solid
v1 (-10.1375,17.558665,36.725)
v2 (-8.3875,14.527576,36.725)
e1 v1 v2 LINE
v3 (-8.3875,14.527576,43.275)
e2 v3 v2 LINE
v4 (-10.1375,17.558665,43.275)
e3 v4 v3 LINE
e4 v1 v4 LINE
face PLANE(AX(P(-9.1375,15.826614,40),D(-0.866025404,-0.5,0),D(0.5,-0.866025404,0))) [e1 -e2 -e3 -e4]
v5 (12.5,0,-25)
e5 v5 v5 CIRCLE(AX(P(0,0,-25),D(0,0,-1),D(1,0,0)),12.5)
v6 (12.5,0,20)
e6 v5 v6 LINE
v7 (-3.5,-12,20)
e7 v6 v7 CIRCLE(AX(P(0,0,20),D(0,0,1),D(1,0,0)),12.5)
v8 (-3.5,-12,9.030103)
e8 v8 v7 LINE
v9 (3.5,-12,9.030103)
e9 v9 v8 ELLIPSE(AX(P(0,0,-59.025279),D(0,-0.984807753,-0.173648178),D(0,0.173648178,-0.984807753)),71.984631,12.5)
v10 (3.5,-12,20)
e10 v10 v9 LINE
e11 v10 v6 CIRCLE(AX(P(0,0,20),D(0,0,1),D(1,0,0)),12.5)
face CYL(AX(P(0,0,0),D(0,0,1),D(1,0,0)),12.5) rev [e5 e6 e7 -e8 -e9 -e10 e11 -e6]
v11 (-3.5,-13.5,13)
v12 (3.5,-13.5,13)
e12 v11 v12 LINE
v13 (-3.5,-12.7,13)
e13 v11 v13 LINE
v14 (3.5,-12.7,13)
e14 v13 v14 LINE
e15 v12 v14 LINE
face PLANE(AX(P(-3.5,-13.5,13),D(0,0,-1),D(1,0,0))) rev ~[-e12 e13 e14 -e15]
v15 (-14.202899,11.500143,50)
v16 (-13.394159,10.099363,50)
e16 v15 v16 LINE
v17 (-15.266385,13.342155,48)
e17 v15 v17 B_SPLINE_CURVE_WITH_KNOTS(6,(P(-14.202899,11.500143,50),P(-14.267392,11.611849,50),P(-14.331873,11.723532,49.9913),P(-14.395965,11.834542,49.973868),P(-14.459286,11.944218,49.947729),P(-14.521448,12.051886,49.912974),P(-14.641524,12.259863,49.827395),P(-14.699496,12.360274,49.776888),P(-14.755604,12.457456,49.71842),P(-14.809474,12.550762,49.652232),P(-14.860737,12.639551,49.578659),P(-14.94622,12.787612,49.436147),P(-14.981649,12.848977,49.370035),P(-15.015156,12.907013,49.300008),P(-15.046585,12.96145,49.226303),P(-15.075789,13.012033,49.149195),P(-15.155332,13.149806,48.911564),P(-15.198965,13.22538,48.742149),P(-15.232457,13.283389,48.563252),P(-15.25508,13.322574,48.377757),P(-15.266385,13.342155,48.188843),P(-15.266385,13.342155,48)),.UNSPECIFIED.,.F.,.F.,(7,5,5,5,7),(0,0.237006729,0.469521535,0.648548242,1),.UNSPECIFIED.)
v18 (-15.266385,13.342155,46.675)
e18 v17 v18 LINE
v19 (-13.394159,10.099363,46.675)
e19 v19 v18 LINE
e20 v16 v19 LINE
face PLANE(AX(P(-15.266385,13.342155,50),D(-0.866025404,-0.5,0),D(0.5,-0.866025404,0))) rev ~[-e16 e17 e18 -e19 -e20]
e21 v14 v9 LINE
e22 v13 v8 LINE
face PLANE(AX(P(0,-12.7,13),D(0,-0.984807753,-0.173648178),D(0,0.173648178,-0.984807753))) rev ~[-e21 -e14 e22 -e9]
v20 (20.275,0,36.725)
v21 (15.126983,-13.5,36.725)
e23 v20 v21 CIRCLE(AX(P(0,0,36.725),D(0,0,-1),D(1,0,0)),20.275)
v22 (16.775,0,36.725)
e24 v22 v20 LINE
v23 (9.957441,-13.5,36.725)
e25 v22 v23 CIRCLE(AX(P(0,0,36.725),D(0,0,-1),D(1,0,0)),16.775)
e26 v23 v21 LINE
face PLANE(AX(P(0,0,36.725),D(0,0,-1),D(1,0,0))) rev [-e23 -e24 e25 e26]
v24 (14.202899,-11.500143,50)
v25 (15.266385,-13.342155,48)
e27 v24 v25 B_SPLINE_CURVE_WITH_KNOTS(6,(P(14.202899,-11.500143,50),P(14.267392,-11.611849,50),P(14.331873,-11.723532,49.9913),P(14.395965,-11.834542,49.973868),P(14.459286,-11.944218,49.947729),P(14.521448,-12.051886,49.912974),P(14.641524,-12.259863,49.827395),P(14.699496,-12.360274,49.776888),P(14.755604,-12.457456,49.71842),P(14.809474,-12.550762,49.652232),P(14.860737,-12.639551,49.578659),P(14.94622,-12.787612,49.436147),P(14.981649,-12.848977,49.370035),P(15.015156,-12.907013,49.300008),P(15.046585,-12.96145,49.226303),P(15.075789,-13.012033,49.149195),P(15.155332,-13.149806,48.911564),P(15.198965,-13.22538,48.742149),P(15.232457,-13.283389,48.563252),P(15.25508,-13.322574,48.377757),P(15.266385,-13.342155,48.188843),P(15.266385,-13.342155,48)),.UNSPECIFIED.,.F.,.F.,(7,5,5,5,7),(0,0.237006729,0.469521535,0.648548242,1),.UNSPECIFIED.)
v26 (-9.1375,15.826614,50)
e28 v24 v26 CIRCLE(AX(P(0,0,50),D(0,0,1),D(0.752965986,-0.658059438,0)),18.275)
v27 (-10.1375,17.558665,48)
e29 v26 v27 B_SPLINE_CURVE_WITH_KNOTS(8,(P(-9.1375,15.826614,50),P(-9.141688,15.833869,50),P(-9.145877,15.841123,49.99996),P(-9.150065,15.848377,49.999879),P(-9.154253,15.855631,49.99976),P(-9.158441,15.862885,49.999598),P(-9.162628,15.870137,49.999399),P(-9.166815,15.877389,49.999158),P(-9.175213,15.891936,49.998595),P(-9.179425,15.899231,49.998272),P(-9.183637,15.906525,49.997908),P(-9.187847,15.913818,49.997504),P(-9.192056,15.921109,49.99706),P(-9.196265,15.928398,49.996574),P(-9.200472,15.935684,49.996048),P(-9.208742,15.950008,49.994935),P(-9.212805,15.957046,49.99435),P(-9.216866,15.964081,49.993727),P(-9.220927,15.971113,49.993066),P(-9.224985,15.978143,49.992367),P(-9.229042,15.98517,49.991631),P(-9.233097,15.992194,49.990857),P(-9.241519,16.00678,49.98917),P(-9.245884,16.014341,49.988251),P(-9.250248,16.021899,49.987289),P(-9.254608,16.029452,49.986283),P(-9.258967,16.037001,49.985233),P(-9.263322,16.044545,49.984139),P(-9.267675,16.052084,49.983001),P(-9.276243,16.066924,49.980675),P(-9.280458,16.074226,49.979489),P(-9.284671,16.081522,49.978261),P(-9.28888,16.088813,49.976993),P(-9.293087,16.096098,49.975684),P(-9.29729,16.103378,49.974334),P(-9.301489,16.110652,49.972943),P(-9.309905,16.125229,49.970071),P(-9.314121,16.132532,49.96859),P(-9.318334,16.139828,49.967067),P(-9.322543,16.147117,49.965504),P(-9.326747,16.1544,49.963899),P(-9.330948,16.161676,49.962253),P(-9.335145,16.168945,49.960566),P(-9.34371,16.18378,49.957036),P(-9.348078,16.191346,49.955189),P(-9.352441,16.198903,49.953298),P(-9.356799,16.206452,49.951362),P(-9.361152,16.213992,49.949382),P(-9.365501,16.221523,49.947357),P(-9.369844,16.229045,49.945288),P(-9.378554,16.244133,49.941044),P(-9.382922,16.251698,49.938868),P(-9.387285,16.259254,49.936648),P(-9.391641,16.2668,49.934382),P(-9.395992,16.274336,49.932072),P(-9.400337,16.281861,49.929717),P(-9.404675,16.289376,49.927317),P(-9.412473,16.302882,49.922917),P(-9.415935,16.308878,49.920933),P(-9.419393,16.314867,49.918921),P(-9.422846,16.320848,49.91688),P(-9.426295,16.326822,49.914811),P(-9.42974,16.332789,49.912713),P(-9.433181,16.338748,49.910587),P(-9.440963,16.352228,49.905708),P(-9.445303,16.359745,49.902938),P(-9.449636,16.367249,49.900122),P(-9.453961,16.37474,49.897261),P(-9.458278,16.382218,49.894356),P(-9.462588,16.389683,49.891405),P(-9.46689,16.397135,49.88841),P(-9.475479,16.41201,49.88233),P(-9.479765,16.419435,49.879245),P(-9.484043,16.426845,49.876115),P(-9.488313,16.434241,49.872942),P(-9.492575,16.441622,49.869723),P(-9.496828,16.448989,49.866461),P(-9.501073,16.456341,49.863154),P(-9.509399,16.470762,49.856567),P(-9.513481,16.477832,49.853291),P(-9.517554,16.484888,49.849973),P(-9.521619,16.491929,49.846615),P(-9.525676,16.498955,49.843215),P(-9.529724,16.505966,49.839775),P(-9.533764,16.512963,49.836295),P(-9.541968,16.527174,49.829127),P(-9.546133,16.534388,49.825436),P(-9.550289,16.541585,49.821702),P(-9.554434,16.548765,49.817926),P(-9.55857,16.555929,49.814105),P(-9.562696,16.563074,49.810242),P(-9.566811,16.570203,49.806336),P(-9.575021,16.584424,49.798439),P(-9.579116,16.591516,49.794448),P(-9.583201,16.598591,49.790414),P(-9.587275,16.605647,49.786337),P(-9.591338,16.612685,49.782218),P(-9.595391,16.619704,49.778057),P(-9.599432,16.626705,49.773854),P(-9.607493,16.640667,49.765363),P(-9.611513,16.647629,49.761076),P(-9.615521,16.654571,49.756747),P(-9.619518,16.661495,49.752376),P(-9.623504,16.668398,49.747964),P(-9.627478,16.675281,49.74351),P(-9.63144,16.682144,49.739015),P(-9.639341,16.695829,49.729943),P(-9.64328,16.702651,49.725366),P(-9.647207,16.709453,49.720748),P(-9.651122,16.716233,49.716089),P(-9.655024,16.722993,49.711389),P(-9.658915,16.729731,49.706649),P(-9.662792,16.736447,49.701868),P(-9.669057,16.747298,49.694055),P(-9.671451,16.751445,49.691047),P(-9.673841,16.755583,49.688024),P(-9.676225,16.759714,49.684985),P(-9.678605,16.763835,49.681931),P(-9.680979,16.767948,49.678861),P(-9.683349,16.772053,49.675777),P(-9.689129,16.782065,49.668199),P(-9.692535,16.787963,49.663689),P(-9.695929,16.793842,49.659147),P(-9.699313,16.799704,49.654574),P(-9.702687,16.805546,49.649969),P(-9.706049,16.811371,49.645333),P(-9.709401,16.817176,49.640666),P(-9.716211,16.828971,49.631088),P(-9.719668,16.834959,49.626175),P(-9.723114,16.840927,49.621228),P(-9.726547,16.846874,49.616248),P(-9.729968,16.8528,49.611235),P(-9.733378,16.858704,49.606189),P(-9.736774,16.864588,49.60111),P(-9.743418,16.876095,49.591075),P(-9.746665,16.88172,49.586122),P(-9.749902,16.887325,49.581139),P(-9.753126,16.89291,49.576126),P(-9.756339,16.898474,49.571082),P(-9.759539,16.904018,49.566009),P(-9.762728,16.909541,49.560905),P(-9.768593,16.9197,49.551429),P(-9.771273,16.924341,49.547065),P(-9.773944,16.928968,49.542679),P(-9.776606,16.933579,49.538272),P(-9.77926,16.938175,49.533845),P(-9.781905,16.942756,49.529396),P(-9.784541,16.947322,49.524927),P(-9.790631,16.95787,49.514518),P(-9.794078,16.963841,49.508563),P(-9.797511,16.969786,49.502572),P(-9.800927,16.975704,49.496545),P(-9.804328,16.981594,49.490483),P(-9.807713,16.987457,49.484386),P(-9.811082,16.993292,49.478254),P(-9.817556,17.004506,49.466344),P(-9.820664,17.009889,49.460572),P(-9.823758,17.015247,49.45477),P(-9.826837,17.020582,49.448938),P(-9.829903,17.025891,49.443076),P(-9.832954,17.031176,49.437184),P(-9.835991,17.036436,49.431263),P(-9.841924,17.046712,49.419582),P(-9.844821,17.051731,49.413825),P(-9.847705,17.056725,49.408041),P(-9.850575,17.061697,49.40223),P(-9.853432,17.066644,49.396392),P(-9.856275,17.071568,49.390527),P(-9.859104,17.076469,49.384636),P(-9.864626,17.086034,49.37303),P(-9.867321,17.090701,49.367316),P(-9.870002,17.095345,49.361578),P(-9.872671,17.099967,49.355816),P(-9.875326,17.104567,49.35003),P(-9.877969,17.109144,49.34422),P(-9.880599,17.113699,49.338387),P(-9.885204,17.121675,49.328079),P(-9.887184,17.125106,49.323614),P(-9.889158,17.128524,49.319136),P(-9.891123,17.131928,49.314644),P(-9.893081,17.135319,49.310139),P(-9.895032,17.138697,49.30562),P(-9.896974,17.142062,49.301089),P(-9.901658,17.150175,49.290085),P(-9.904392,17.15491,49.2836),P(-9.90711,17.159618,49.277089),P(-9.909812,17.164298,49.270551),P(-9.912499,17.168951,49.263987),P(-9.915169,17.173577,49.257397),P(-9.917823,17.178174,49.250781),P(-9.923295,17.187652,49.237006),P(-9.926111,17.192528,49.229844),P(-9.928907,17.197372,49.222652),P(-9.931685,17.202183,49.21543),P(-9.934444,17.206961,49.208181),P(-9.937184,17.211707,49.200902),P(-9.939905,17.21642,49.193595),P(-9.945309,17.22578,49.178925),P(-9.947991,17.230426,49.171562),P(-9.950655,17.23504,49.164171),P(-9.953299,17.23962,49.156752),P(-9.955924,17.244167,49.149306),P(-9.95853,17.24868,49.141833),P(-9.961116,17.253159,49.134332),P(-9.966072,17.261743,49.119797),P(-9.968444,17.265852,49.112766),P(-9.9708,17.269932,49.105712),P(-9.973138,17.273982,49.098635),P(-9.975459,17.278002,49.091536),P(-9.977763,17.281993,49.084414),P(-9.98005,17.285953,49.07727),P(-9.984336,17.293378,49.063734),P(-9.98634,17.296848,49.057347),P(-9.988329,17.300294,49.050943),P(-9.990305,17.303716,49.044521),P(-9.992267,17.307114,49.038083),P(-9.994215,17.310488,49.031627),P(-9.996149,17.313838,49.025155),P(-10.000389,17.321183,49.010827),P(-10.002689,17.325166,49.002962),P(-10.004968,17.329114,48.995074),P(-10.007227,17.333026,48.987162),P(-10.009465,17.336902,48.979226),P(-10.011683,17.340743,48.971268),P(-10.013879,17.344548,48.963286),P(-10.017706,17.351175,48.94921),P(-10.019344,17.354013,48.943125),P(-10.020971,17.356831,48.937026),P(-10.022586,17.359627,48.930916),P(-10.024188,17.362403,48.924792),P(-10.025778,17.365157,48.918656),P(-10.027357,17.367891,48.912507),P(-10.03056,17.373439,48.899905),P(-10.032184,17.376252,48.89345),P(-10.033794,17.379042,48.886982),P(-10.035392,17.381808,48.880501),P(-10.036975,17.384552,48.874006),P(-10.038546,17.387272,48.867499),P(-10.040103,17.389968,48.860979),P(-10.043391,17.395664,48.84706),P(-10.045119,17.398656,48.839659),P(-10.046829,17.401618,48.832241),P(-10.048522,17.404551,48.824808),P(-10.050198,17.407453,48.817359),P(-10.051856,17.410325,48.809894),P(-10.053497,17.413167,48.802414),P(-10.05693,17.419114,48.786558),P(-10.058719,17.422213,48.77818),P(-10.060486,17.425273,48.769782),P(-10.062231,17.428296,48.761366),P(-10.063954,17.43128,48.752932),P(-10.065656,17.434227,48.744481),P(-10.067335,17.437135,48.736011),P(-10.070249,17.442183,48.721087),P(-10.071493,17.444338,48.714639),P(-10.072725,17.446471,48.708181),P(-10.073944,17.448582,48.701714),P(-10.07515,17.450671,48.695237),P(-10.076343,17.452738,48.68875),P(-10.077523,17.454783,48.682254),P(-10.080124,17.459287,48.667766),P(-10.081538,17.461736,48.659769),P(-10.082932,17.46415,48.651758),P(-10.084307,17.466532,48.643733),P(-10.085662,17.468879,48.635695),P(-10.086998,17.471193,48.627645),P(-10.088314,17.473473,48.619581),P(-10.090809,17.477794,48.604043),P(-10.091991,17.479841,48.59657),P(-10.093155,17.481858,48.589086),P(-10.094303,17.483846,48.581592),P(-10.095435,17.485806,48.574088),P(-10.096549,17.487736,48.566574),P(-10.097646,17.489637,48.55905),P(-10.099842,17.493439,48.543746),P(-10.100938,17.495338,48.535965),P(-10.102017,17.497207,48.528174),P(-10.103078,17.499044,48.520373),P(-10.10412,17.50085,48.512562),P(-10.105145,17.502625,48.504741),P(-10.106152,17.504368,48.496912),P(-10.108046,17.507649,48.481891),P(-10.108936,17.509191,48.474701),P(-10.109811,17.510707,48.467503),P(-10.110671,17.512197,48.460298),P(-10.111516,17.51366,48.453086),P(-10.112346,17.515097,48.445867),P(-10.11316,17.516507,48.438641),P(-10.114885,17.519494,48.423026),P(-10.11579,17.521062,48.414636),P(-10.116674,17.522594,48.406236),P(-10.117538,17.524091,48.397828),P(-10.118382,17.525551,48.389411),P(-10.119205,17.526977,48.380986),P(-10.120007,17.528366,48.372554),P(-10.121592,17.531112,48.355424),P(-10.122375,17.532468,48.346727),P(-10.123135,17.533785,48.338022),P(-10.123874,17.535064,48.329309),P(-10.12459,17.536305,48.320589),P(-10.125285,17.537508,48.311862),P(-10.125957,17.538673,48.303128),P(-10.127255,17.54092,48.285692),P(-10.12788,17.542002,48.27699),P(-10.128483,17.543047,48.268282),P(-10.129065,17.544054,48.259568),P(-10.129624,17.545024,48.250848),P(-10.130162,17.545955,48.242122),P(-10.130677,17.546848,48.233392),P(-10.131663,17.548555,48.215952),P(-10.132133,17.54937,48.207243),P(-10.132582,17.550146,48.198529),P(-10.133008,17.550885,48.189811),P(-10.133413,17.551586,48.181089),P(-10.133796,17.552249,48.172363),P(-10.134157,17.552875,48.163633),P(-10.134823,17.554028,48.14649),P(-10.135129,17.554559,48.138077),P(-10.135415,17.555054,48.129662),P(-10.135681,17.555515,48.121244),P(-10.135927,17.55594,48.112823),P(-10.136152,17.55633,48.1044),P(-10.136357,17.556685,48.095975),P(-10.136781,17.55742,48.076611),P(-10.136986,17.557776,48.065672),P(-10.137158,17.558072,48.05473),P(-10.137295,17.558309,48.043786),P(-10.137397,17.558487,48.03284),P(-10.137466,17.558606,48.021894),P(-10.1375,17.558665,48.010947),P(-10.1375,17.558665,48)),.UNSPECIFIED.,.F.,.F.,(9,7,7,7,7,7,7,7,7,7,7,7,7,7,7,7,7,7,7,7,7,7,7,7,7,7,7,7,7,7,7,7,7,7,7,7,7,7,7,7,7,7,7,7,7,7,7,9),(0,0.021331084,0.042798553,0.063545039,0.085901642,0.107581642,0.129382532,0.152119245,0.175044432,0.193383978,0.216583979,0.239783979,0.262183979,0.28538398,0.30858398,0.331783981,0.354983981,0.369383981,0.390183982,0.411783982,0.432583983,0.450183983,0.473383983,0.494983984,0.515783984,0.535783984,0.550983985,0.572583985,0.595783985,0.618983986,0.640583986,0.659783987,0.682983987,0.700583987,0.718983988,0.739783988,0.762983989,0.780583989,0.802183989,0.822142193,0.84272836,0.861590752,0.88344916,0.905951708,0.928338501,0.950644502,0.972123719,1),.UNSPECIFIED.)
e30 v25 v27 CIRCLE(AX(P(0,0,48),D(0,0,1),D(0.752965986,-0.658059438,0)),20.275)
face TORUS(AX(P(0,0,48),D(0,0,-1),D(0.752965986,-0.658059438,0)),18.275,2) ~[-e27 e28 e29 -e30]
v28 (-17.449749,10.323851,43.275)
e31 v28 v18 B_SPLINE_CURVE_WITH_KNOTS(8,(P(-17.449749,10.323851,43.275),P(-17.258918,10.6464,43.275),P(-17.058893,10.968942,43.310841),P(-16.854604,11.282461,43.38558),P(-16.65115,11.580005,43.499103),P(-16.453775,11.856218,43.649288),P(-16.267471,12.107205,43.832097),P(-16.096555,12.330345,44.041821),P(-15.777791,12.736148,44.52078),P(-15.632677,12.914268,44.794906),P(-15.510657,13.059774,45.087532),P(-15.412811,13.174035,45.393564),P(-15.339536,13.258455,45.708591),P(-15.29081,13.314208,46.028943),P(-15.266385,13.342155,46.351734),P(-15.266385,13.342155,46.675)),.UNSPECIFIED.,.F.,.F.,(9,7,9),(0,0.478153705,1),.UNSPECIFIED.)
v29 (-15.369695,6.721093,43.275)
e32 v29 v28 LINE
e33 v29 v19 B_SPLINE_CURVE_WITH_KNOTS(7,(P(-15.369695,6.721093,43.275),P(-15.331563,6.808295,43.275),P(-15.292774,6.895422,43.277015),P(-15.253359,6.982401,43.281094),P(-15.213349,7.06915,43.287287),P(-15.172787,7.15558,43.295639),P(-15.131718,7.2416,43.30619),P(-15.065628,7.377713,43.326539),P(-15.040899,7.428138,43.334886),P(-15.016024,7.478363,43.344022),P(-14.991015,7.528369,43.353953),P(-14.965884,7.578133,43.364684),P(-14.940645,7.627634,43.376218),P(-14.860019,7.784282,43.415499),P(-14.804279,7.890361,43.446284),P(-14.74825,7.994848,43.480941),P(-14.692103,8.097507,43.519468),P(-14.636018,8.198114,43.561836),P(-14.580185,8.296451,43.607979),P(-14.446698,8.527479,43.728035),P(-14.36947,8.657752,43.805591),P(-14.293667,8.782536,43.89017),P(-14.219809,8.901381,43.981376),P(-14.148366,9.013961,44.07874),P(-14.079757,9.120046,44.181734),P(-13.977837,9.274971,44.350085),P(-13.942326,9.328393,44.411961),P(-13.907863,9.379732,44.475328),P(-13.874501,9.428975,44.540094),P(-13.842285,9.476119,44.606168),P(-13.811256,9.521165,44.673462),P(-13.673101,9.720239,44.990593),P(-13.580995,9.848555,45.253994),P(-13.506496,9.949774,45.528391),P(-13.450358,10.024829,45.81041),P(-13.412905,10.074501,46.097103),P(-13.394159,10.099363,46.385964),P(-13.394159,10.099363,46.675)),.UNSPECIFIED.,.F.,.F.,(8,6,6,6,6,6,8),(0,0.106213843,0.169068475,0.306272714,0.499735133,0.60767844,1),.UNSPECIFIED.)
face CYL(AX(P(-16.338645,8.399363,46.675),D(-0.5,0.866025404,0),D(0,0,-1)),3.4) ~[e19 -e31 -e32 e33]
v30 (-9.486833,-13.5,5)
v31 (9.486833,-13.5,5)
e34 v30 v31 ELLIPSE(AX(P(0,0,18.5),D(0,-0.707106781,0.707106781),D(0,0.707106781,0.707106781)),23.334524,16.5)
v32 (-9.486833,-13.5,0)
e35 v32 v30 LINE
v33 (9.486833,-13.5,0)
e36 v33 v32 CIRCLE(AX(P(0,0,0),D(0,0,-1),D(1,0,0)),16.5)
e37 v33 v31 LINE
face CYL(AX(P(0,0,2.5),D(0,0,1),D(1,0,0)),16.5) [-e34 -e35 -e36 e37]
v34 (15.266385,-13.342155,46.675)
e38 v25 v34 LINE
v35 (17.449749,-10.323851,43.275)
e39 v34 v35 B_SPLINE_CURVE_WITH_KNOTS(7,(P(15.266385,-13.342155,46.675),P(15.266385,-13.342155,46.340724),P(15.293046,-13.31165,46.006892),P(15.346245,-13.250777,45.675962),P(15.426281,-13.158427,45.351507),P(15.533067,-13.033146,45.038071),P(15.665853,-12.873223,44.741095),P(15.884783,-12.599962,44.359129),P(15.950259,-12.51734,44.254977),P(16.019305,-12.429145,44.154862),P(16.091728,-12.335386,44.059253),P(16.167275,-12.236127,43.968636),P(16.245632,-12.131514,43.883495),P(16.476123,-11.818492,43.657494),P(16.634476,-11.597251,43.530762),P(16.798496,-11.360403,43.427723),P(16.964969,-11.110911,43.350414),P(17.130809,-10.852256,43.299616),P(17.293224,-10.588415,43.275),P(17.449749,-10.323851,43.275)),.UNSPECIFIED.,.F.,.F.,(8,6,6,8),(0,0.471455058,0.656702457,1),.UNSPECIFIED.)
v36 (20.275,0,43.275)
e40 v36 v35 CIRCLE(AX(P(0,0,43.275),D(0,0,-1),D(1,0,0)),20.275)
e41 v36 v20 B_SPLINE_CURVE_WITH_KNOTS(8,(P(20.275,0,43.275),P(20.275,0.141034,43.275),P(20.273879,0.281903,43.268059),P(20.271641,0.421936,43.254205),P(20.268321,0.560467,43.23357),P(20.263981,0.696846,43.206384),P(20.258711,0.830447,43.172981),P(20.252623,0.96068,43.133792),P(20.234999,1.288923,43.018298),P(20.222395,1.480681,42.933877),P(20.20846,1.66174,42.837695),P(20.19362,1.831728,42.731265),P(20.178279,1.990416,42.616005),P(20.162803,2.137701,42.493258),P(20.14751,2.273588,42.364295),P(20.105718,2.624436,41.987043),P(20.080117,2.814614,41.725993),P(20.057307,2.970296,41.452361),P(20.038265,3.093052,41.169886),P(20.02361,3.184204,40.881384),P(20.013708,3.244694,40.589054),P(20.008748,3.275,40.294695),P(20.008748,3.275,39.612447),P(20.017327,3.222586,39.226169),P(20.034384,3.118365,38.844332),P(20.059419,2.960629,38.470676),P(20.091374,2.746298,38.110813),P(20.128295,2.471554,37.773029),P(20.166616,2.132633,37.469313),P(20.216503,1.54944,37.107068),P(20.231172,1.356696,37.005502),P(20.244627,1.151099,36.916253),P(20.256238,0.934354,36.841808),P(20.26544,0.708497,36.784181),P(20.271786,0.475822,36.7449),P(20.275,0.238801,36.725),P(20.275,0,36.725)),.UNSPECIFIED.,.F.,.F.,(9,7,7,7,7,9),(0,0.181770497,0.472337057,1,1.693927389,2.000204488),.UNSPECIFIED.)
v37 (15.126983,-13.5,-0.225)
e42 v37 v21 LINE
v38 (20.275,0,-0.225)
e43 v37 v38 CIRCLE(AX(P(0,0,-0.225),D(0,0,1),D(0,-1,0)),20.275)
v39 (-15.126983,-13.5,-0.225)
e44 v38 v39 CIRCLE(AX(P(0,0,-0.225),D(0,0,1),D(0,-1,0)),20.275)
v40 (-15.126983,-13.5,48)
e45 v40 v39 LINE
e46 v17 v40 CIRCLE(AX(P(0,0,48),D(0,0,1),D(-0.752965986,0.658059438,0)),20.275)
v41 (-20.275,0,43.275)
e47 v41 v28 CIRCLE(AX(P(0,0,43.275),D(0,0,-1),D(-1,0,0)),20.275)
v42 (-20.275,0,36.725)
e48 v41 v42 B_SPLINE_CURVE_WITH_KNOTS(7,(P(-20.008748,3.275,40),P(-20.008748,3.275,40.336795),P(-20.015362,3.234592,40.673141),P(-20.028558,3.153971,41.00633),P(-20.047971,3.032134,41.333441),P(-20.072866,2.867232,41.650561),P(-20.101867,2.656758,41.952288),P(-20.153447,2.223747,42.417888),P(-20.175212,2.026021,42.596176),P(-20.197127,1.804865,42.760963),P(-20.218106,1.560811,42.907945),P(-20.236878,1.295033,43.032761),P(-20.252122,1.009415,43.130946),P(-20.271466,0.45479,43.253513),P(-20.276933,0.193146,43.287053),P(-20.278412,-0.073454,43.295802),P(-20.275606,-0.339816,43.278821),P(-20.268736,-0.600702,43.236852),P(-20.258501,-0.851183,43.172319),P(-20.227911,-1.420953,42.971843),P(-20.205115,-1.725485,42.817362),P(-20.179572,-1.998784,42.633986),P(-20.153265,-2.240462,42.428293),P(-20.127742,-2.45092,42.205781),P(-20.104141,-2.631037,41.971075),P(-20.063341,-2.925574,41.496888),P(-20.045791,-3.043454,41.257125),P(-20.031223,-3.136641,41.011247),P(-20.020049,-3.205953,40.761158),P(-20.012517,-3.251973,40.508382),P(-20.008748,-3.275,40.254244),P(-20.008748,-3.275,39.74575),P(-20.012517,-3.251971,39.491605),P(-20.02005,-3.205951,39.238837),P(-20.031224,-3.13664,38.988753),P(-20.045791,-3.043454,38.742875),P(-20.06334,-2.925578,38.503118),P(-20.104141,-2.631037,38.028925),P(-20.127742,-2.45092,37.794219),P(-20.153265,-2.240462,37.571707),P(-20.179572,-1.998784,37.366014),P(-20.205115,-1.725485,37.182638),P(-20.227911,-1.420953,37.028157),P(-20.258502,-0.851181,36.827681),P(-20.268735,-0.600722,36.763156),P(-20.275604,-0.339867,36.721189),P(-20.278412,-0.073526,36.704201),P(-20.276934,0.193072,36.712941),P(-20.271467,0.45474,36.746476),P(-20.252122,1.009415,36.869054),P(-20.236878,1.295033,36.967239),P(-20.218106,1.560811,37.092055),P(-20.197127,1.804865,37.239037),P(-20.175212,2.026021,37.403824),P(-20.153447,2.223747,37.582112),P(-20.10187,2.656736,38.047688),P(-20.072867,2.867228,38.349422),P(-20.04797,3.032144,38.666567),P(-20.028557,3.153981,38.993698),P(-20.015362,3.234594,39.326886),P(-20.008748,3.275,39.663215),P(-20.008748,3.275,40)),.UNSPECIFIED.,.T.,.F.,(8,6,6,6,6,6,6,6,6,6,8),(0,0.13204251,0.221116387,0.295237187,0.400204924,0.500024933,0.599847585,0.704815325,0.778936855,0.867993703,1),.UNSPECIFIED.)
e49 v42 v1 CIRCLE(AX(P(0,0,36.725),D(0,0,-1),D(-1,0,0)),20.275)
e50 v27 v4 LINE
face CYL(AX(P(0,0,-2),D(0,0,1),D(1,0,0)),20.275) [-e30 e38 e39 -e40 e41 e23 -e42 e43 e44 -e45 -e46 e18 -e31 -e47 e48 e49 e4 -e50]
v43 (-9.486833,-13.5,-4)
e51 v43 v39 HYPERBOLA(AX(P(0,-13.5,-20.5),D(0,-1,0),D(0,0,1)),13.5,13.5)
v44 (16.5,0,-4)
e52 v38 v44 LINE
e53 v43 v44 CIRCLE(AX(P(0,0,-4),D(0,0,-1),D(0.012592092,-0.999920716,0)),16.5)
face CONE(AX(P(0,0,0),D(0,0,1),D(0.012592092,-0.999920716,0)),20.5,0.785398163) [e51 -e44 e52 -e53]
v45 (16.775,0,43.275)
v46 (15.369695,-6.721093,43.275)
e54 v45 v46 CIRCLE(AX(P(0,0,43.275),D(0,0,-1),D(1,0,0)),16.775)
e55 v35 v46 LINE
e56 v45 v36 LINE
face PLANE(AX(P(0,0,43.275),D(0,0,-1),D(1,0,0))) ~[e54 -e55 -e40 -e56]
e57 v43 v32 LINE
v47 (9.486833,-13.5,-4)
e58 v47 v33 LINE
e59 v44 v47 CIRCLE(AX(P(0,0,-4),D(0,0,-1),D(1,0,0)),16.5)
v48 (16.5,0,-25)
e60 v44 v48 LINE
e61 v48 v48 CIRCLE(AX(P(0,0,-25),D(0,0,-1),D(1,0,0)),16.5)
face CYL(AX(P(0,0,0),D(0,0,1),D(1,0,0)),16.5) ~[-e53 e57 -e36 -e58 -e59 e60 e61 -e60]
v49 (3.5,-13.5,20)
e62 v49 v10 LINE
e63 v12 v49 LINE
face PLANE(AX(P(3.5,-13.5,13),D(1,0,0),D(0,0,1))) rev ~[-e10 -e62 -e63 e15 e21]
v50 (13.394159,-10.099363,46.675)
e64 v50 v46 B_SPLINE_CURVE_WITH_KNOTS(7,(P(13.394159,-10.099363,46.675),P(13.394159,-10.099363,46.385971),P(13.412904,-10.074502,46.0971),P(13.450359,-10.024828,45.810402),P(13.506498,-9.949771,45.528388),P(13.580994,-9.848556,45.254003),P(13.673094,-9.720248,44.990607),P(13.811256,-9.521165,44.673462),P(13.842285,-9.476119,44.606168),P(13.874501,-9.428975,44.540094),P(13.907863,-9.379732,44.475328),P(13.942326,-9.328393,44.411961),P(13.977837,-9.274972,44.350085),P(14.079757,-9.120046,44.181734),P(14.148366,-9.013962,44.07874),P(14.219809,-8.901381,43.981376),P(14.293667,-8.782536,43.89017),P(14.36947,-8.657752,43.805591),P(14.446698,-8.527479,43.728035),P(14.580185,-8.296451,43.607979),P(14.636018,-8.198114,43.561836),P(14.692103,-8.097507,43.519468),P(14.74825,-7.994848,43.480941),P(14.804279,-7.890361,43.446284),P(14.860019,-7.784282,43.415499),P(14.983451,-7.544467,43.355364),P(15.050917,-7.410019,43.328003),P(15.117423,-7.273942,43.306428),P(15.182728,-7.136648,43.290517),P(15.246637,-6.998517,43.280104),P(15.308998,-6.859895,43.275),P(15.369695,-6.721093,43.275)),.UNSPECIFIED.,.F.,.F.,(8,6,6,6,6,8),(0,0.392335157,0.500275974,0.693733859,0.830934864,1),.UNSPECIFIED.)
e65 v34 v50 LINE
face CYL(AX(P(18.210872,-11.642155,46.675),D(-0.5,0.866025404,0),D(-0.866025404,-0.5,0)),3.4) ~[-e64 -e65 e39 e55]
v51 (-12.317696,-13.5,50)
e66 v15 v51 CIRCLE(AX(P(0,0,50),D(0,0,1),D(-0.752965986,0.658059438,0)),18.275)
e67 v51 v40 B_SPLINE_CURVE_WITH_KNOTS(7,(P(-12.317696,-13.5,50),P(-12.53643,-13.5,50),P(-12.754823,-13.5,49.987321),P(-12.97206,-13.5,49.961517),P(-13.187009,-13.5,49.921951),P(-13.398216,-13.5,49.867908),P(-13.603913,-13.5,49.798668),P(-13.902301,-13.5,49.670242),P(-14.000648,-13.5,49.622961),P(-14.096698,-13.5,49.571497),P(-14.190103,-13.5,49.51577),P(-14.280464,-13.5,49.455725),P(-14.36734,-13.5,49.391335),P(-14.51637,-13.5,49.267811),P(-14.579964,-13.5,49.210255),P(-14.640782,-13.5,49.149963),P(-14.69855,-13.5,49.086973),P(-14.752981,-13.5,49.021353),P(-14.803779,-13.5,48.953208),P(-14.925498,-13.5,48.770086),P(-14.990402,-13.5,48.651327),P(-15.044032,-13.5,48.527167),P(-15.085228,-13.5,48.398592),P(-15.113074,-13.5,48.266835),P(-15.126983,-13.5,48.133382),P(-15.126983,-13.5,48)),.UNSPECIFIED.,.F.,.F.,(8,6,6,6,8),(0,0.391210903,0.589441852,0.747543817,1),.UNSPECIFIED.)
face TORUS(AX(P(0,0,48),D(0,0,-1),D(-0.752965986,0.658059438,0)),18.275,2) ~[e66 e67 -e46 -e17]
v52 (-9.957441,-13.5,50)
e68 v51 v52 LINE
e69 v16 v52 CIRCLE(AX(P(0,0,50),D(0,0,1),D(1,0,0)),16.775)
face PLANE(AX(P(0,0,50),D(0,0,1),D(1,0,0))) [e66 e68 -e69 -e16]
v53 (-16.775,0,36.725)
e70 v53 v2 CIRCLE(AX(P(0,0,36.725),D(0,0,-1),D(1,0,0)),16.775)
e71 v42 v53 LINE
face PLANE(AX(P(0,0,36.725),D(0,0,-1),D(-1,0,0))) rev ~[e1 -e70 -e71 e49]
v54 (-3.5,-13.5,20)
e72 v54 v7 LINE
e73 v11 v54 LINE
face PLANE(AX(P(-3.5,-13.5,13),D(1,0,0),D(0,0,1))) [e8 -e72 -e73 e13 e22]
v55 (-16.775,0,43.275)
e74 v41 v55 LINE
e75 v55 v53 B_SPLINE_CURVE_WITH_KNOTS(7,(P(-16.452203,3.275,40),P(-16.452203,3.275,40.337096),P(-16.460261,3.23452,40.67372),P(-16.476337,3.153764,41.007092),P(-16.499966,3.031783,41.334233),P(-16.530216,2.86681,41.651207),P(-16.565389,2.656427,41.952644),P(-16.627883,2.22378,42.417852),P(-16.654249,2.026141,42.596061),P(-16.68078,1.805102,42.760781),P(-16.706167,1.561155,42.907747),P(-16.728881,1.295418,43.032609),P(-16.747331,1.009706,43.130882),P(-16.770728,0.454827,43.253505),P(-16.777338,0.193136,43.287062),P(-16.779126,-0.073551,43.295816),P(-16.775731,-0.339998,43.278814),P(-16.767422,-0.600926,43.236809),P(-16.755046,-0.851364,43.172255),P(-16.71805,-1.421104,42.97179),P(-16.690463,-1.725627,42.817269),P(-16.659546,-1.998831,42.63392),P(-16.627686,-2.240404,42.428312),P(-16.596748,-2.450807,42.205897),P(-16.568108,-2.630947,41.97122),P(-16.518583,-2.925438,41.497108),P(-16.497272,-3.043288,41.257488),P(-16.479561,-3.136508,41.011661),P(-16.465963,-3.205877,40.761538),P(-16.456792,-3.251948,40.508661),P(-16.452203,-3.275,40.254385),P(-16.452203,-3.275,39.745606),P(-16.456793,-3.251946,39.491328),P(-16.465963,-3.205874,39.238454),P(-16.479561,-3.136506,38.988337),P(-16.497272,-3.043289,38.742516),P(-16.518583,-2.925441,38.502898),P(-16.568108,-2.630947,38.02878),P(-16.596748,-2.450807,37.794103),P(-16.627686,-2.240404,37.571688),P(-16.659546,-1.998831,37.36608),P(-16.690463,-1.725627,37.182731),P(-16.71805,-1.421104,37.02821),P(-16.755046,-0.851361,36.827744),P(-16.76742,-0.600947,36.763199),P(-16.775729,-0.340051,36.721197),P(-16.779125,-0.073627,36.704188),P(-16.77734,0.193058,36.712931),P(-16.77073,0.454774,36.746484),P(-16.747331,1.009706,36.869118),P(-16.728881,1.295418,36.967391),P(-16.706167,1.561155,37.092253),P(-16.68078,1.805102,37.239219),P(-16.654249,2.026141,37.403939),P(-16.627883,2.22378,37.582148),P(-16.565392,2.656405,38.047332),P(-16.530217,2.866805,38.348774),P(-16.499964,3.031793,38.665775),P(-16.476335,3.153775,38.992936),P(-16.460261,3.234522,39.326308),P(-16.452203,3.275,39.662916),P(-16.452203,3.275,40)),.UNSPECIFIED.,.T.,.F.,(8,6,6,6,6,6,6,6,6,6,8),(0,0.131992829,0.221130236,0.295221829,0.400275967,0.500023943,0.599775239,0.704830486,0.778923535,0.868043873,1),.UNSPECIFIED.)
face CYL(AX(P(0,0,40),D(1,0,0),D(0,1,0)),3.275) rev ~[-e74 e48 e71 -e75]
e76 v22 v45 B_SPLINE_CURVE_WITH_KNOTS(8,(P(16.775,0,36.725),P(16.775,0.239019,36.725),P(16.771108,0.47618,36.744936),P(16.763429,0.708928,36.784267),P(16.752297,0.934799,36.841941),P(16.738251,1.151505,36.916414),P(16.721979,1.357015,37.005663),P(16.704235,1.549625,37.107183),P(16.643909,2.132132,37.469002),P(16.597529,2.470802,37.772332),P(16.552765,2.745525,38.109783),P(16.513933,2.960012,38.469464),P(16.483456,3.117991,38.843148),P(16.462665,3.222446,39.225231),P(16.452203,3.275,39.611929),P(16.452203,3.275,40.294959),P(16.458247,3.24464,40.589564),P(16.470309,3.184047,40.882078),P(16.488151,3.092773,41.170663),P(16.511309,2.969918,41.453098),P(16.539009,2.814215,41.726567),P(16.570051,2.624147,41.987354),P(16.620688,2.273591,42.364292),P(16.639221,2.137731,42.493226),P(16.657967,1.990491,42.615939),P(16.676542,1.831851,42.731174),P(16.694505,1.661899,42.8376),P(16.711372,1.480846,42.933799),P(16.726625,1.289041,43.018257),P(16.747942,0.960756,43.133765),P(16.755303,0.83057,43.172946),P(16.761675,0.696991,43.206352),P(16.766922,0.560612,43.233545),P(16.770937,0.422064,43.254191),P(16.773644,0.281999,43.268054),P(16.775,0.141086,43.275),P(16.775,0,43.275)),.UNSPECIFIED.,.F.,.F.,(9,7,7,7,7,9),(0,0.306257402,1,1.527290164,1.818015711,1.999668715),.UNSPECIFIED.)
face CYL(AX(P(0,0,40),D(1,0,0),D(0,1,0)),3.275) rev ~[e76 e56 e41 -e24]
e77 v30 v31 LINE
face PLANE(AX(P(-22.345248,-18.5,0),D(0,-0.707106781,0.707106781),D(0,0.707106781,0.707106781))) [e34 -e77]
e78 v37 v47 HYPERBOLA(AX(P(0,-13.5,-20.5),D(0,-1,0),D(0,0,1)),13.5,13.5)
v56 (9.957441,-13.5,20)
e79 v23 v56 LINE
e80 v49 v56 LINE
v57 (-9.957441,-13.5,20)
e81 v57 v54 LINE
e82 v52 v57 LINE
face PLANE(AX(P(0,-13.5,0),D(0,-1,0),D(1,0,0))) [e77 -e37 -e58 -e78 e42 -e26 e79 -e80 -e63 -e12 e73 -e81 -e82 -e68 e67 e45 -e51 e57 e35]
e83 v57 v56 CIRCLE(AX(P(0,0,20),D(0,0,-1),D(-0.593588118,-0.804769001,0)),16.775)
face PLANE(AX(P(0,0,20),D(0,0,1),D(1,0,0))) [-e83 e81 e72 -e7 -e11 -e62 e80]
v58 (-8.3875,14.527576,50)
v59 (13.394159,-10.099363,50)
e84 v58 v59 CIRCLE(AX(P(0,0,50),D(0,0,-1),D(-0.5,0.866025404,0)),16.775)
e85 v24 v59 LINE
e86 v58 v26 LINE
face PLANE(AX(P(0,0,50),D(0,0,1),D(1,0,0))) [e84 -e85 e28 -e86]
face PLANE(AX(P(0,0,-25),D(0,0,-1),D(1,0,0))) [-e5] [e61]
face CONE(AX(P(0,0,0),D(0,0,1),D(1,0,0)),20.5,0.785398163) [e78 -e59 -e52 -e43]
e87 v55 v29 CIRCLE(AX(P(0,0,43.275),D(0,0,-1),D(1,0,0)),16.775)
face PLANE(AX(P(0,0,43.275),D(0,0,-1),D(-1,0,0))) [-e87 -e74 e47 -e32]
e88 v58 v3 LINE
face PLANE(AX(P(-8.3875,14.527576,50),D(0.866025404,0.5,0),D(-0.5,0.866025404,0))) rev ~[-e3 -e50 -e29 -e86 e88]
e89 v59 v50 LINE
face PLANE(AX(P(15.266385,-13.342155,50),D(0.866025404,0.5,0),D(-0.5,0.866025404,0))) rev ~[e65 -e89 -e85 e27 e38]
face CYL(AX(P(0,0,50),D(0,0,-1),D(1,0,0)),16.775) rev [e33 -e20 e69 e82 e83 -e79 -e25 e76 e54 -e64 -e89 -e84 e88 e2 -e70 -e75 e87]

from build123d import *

# Parameters (mm, degrees)
F2_R          = 3.275
F3_DEPTH      = 25
F4_W          = 4
F4_H          = 6.55
F5_ANGLE      = 60
F6_W          = 4
F6_H          = 6.55
F7_ANGLE      = 60
F9_DEPTH      = 10
F10_W         = 32
F10_H         = 8
F11_DEPTH     = 50.0010001
F12_W         = 7
F12_H         = 7
F13_DEPTH     = 5
F15_DEPTH     = 3.5
F16_R         = 2
F17_R         = 3.4
F18_R         = 16.5
F18_R_2       = 12.5
F19_DEPTH     = 25
F20_T4_ANGLE  = 270.7214927844
F20_S5_R      = 20.275
F20_T6_DEPTH  = 31
F20_T11_ANGLE = 90.6289211612
F20_S12_R     = 20.275
F20_T13_DEPTH = 16
F21_T4_DEPTH  = 44.6904958407
F21_S5_R      = 16.5
F21_T6_DEPTH  = 24


# Not quite as in the source:
# - a fillet or chamfer that OpenCascade refuses, or shapes differently, is made with other operations: its cross-section is extruded or revolved along the edge and cut away or added


with BuildPart() as f1:
    # F0 (on Front) → F1 (revolve)
    with BuildSketch(Plane.XZ):
        Polygon((20.275, 50), (16.775, 50), (16.775, 20), (12.5, 20), (12.5, 0), (20.275, 0), align=None)
    revolve(axis=Axis((0, 0, 24.5366517103), (0, 0, 1)))

    # F2 (on Right) → F3 (cut, symmetric)
    with BuildSketch(Plane.YZ):
        with Locations((0, 40)):
            Circle(F2_R)
    extrude(amount=F3_DEPTH, both=True, mode=Mode.SUBTRACT)

    # F4 (on Front) → F5 (revolve, cut)
    with BuildSketch(Plane.XZ):
        with Locations((18.275, 40)):
            Rectangle(F4_W, F4_H)
    revolve(axis=Axis((0, 0, 25.1644738019), (0, 0, -1)), revolution_arc=F5_ANGLE, mode=Mode.SUBTRACT)

    # F6 (on Front) → F7 (revolve, cut)
    with BuildSketch(Plane.XZ):
        with Locations((-18.275, 40)):
            Rectangle(F6_W, F6_H)
    revolve(axis=Axis((0, 0, 23.5361852683), (0, 0, -1)), revolution_arc=F7_ANGLE, mode=Mode.SUBTRACT)

    # F8 (on face) → F9 (cut)
    with BuildSketch(Plane.XY.offset(50)):
        with BuildLine():
            Line((-8.3875, 14.5275761485), (-10.1375, 17.5586650617))
            ThreePointArc((-10.1375, 17.5586650617), (-12.8757169507, 15.6617859137), (-15.2663853672, 13.342155104))
            Line((-15.2663853672, 13.342155104), (-13.3941586478, 10.0993633026))
            ThreePointArc((-13.3941586478, 10.0993633026), (-11.1136146512, 12.5653569144), (-8.3875, 14.5275761485))
        make_face()
        with BuildLine():
            Line((8.3875, -14.5275761485), (10.1375, -17.5586650617))
            ThreePointArc((10.1375, -17.5586650617), (12.8757169507, -15.6617859137), (15.2663853672, -13.342155104))
            Line((15.2663853672, -13.342155104), (13.3941586478, -10.0993633026))
            ThreePointArc((13.3941586478, -10.0993633026), (11.1136146512, -12.5653569144), (8.3875, -14.5275761485))
        make_face()
    extrude(amount=-F9_DEPTH, mode=Mode.SUBTRACT)

    # F10 (on face) → F11 (cut, through all)
    with BuildSketch(Plane.XY.offset(50)):
        with Locations((0, -17.5)):
            Rectangle(F10_W, F10_H)
    extrude(amount=-F11_DEPTH, mode=Mode.SUBTRACT)

    # F12 (on face) → F13 (cut)
    with BuildSketch(Plane.XZ.offset(13.5)):
        with Locations((0, 16.5)):
            Rectangle(F12_W, F12_H)
    extrude(amount=-F13_DEPTH, mode=Mode.SUBTRACT)

    # F14 (on Right) → F15 (cut, symmetric)
    with BuildSketch(Plane.YZ):
        Polygon((-10.3, 13), (-12.7, 13), (-11.2893841543, 5), (-10.3, 5), align=None)
    extrude(amount=F15_DEPTH, both=True, mode=Mode.SUBTRACT)

    # F16
    f16_edges = [f1.edges().sort_by_distance(p)[0] for p in [
        (15.661786, 12.875717, 50),
        (-20.274727, -0.105295, 50),
    ]]
    fillet(f16_edges, radius=F16_R)

    # F17
    f17_edges = [f1.edges().sort_by_distance(p)[0] for p in [
        (-14.330272, 11.720759, 43.275),
        (14.330272, -11.720759, 43.275),
    ]]
    fillet(f17_edges, radius=F17_R)

    # F18 (on face) → F19 (join)
    with BuildSketch(Plane(origin=(0, 0, 0), x_dir=(1, 0, 0), z_dir=(0, 0, -1))):
        Circle(F18_R)
        Circle(F18_R_2, mode=Mode.SUBTRACT)
    extrude(amount=F19_DEPTH)

    # F20: chamfer of 4 on 2 edges, made by hand


with BuildPart() as f20_tool2:
    # F20_s3 → F20_t4 (revolve)
    with BuildSketch(Plane(origin=(0, 0, 0), x_dir=(0, 0, 1), z_dir=(0.9999207165, 0.0125920918, 0))):
        Polygon((0, 20.5), (-4, 16.5), (0, 16.5), align=None)
    revolve(axis=Axis((0, 0, 0), (0, 0, -1)), revolution_arc=F20_T4_ANGLE)

    # F20_s5 → F20_t6 (intersect, symmetric)
    with BuildSketch(Plane.XY.offset(-2)):
        Circle(F20_S5_R)
    extrude(amount=F20_T6_DEPTH, both=True, mode=Mode.INTERSECT)

    split(bisect_by=Plane.XZ.offset(13.5), keep=Keep.BOTTOM)


with BuildPart() as f1_1:
    add(f1.part)

    # F20_t1: union F20_tool2
    add(f20_tool2.part)


with BuildPart() as f20_tool9:
    # F20_s10 → F20_t11 (revolve)
    with BuildSketch(Plane.XZ):
        Polygon((20.5, 0), (16.5, -4), (16.5, 0), align=None)
    revolve(axis=Axis((0, 0, 0), (0, 0, -1)), revolution_arc=F20_T11_ANGLE)

    # F20_s12 → F20_t13 (intersect, symmetric)
    with BuildSketch(Plane.XY.offset(-2)):
        Circle(F20_S12_R)
    extrude(amount=F20_T13_DEPTH, both=True, mode=Mode.INTERSECT)

    split(bisect_by=Plane.XZ.offset(13.5), keep=Keep.BOTTOM)


with BuildPart() as f1_2:
    add(f1_1.part)

    # F20_t8: union F20_tool9
    add(f20_tool9.part)

    # F21: chamfer of 5 on 1 edges, made by hand


with BuildPart() as f21_tool2:
    # F21_s3 → F21_t4 (new body)
    with BuildSketch(Plane.YZ.offset(-22.3452479203)):
        Polygon((-18.5, 0), (-13.5, 5), (-13.5, 0), align=None)
    extrude(amount=F21_T4_DEPTH)

    # F21_s5 → F21_t6 (intersect, symmetric)
    with BuildSketch(Plane.XY.offset(2.5)):
        Circle(F21_S5_R)
    extrude(amount=F21_T6_DEPTH, both=True, mode=Mode.INTERSECT)


with BuildPart() as f1_3:
    add(f1_2.part)

    # F21_t1: union F21_tool2
    add(f21_tool2.part)


solid = f1_3.part
